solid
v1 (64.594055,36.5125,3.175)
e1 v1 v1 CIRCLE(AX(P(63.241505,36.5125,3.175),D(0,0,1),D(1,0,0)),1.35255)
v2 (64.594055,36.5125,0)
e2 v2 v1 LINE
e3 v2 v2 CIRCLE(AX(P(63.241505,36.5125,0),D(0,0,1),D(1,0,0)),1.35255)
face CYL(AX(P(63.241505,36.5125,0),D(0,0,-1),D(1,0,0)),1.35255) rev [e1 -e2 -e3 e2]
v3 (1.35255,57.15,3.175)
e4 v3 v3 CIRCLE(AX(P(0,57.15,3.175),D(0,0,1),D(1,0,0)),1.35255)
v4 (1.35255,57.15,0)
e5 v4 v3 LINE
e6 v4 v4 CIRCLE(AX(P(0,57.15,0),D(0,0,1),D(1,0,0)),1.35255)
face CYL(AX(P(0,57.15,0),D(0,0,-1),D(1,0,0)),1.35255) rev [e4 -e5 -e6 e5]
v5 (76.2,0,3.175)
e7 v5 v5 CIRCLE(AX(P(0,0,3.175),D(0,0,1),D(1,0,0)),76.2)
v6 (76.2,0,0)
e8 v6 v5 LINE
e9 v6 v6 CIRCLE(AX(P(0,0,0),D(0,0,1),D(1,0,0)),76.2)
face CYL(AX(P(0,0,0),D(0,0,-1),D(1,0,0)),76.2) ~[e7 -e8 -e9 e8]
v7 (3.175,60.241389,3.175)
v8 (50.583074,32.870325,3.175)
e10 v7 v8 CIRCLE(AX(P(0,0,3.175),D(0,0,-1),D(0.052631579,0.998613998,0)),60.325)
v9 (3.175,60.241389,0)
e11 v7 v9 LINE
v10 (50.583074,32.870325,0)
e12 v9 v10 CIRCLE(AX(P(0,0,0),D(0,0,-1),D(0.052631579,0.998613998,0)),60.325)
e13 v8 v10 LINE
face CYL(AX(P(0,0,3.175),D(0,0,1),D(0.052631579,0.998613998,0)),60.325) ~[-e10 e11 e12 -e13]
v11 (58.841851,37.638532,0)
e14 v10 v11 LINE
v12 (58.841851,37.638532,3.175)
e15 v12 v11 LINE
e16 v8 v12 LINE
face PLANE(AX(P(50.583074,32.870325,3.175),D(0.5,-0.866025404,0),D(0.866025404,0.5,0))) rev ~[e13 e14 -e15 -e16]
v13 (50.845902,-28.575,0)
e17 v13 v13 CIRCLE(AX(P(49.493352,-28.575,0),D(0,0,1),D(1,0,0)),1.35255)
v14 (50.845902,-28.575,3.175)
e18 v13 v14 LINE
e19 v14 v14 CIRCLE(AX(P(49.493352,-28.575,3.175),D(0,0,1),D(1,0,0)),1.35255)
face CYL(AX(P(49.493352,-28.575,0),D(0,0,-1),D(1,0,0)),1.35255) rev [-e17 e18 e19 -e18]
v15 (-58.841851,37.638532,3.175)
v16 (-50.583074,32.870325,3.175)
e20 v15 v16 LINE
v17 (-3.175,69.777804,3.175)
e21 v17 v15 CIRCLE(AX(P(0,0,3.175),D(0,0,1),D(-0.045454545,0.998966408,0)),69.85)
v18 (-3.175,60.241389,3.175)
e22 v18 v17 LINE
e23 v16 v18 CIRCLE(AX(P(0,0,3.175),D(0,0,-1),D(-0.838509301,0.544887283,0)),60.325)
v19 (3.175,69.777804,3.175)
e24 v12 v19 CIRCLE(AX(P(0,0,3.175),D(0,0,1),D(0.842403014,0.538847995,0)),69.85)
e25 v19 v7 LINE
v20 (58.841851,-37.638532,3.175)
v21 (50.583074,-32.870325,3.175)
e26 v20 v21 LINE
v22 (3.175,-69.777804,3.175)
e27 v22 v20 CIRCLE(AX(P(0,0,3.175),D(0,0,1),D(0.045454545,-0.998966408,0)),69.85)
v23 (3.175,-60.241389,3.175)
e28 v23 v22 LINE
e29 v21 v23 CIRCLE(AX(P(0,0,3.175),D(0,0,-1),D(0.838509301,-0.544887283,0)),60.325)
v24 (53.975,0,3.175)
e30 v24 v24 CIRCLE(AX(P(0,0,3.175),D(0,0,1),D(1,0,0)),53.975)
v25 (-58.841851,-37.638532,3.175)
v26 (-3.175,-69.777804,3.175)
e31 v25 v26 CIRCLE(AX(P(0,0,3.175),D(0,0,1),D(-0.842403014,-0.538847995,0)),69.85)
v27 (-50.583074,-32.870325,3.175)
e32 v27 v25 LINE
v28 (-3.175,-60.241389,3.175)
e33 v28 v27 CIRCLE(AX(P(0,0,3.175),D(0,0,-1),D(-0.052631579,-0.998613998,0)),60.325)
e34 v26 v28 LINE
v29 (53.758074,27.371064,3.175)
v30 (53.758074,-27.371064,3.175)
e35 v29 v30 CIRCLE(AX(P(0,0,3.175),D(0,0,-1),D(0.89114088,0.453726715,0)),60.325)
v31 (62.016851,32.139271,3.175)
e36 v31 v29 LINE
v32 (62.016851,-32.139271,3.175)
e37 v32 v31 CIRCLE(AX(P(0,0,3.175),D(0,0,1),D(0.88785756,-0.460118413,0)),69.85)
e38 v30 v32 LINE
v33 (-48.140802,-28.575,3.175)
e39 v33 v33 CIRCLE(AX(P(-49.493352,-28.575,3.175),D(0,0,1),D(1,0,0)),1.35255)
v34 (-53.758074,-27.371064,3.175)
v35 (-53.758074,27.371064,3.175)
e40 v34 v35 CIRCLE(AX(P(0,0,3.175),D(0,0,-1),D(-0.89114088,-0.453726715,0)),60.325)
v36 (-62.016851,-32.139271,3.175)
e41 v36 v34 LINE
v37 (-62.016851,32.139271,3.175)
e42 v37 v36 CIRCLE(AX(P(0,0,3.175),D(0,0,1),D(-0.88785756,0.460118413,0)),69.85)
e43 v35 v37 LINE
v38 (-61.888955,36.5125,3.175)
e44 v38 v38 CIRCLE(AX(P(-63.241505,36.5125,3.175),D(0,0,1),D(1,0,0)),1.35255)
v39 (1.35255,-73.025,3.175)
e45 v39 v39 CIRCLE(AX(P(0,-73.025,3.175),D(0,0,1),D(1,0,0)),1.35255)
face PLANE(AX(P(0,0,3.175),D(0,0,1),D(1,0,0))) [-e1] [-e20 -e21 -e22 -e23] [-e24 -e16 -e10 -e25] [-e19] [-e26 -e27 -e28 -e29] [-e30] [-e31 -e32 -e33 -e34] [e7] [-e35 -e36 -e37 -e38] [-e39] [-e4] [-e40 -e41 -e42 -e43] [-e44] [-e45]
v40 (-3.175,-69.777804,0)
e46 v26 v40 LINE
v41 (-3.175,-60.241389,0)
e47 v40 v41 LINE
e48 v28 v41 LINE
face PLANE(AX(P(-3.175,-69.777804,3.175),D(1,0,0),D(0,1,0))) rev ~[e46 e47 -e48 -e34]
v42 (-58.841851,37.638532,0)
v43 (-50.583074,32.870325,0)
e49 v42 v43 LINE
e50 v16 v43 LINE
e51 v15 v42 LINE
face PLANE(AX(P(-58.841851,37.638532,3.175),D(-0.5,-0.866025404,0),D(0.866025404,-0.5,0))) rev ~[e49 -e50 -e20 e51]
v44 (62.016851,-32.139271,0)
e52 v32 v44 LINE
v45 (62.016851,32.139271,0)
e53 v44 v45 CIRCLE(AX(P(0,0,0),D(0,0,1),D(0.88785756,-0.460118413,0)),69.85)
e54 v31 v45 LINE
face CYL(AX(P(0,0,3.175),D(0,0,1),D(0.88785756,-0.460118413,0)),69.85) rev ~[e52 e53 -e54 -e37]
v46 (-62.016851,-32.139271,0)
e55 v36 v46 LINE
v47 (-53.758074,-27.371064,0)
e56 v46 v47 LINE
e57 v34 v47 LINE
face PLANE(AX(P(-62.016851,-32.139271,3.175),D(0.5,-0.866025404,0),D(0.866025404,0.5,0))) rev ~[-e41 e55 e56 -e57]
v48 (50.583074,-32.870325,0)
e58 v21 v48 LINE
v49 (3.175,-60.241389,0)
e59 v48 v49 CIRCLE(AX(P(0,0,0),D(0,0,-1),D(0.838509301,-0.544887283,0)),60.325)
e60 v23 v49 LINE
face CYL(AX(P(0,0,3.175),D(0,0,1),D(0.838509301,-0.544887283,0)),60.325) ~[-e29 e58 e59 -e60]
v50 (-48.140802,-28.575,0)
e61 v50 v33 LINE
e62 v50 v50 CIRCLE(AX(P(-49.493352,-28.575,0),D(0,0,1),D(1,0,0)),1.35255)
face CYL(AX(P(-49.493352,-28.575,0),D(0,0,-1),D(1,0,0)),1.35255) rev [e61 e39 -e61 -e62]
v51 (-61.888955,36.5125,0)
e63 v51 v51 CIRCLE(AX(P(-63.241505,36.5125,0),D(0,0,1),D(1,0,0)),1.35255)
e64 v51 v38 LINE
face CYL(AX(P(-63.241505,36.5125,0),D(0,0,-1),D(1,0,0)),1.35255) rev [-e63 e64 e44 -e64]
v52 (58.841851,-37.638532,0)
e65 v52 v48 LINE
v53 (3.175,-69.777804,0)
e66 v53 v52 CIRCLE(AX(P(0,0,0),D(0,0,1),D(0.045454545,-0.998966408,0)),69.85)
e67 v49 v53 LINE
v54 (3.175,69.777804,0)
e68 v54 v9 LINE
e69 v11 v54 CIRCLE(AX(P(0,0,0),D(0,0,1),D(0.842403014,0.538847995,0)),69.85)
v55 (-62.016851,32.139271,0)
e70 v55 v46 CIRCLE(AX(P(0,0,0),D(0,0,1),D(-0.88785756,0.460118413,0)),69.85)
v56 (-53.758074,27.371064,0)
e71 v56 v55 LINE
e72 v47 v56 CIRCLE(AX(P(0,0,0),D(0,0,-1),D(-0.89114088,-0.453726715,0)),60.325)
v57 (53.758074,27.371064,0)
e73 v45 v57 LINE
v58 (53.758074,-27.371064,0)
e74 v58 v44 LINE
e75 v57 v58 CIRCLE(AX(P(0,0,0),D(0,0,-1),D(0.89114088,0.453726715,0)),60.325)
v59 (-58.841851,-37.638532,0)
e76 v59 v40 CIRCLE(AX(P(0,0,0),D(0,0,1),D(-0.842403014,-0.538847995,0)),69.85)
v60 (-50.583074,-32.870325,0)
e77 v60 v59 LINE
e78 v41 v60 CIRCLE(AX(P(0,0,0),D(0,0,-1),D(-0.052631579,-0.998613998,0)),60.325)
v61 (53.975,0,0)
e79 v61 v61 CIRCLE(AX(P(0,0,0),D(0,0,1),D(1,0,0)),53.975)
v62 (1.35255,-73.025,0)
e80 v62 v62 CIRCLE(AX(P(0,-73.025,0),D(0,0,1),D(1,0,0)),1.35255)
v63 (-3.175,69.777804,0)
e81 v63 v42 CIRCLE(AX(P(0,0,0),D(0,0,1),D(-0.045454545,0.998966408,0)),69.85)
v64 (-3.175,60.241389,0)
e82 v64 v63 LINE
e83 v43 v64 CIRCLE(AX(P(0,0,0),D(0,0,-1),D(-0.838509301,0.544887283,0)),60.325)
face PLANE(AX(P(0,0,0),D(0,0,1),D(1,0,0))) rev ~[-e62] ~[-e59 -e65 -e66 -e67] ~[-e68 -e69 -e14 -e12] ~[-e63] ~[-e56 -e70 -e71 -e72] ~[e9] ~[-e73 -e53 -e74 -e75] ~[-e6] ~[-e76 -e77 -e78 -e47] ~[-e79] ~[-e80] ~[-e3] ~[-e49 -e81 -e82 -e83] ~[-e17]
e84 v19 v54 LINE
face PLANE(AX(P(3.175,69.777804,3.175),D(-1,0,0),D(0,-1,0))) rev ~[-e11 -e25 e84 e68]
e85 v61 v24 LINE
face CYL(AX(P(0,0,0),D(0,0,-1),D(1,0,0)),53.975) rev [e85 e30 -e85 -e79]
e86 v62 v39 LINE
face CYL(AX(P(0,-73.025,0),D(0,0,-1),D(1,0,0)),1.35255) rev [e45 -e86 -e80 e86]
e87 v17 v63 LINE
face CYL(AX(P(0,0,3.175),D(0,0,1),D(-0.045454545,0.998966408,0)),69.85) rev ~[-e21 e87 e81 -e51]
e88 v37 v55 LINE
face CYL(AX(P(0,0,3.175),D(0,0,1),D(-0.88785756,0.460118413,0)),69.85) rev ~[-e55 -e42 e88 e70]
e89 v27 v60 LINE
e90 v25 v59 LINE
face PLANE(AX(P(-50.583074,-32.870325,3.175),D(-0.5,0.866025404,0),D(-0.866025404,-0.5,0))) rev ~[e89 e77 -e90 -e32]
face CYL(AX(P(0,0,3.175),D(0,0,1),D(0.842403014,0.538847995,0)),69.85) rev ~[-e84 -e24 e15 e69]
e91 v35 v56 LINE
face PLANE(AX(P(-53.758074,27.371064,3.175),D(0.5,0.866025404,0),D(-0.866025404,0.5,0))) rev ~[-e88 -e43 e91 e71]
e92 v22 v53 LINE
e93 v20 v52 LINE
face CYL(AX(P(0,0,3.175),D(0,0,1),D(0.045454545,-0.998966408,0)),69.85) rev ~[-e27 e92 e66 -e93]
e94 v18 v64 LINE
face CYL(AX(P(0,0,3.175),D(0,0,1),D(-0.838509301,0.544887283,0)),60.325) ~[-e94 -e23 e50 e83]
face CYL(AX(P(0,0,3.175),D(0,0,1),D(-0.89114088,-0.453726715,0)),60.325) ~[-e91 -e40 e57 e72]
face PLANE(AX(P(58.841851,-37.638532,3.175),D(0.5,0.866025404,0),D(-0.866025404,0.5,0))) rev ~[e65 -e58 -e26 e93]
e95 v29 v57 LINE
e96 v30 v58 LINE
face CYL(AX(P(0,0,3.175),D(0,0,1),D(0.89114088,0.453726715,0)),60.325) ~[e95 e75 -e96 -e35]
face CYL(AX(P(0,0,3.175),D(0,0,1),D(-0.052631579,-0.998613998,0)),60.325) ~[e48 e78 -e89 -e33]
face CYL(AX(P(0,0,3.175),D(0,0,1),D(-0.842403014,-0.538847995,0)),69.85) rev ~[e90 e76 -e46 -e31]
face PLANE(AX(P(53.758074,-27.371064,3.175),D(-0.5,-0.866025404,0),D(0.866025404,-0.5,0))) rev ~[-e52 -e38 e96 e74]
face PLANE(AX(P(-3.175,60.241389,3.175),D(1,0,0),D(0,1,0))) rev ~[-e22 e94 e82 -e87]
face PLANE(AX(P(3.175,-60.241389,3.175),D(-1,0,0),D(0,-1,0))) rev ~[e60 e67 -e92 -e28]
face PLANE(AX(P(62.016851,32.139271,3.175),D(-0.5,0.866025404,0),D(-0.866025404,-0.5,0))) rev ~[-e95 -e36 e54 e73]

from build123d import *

# Parameters (mm, degrees)
F0_R            = 76.2
F0_R_2          = 1.35255
F0_R_3          = 53.975
F1_DEPTH        = 3.175
F3_DEPTH        = 3.175
F3_COPIES_COUNT = 6


# Not quite as in the source:
# - a pattern or mirror of a feature is missing from the dataset's text; its kind, count and spacing are read off the source's solid


with BuildPart() as f1:
    # F0 (on Top) → F1 (new body)
    with BuildSketch(Plane.XY):
        Circle(F0_R)
        with Locations((-49.4933518263, -28.575)):
            Circle(F0_R_2, mode=Mode.SUBTRACT)
        with Locations((0, -73.025)):
            Circle(F0_R_2, mode=Mode.SUBTRACT)
        with Locations((49.4933518263, -28.575)):
            Circle(F0_R_2, mode=Mode.SUBTRACT)
        with Locations((-63.2415051114, 36.5125)):
            Circle(F0_R_2, mode=Mode.SUBTRACT)
        Circle(F0_R_3, mode=Mode.SUBTRACT)
        with Locations((63.2415051114, 36.5125)):
            Circle(F0_R_2, mode=Mode.SUBTRACT)
        with Locations((0, 57.15)):
            Circle(F0_R_2, mode=Mode.SUBTRACT)
    extrude(amount=F1_DEPTH)

    # F2 (on face) → F3 (cut, through all)
    with BuildSketch(Plane.XY.offset(3.175)):
        with BuildLine():
            ThreePointArc((-53.7580736024, -27.3710640561), (-60.325, 0), (-53.7580736024, 27.3710640561))
            Line((-53.7580736024, 27.3710640561), (-62.0168505364, 32.1392711421))
            ThreePointArc((-62.0168505364, 32.1392711421), (-69.85, 0), (-62.0168505364, -32.1392711421))
            Line((-62.0168505364, -32.1392711421), (-53.7580736024, -27.3710640561))
        make_face()
    f3 = extrude(amount=-F3_DEPTH, mode=Mode.SUBTRACT)

    # F3_copies: F3 ×6 about axis
    f3_copies_axis = Axis((0, 0, 0), (0, 0, 1))
    for i in range(1, F3_COPIES_COUNT):
        add(f3.rotate(f3_copies_axis, i * 360 / F3_COPIES_COUNT), mode=Mode.SUBTRACT)


solid = f1.part
